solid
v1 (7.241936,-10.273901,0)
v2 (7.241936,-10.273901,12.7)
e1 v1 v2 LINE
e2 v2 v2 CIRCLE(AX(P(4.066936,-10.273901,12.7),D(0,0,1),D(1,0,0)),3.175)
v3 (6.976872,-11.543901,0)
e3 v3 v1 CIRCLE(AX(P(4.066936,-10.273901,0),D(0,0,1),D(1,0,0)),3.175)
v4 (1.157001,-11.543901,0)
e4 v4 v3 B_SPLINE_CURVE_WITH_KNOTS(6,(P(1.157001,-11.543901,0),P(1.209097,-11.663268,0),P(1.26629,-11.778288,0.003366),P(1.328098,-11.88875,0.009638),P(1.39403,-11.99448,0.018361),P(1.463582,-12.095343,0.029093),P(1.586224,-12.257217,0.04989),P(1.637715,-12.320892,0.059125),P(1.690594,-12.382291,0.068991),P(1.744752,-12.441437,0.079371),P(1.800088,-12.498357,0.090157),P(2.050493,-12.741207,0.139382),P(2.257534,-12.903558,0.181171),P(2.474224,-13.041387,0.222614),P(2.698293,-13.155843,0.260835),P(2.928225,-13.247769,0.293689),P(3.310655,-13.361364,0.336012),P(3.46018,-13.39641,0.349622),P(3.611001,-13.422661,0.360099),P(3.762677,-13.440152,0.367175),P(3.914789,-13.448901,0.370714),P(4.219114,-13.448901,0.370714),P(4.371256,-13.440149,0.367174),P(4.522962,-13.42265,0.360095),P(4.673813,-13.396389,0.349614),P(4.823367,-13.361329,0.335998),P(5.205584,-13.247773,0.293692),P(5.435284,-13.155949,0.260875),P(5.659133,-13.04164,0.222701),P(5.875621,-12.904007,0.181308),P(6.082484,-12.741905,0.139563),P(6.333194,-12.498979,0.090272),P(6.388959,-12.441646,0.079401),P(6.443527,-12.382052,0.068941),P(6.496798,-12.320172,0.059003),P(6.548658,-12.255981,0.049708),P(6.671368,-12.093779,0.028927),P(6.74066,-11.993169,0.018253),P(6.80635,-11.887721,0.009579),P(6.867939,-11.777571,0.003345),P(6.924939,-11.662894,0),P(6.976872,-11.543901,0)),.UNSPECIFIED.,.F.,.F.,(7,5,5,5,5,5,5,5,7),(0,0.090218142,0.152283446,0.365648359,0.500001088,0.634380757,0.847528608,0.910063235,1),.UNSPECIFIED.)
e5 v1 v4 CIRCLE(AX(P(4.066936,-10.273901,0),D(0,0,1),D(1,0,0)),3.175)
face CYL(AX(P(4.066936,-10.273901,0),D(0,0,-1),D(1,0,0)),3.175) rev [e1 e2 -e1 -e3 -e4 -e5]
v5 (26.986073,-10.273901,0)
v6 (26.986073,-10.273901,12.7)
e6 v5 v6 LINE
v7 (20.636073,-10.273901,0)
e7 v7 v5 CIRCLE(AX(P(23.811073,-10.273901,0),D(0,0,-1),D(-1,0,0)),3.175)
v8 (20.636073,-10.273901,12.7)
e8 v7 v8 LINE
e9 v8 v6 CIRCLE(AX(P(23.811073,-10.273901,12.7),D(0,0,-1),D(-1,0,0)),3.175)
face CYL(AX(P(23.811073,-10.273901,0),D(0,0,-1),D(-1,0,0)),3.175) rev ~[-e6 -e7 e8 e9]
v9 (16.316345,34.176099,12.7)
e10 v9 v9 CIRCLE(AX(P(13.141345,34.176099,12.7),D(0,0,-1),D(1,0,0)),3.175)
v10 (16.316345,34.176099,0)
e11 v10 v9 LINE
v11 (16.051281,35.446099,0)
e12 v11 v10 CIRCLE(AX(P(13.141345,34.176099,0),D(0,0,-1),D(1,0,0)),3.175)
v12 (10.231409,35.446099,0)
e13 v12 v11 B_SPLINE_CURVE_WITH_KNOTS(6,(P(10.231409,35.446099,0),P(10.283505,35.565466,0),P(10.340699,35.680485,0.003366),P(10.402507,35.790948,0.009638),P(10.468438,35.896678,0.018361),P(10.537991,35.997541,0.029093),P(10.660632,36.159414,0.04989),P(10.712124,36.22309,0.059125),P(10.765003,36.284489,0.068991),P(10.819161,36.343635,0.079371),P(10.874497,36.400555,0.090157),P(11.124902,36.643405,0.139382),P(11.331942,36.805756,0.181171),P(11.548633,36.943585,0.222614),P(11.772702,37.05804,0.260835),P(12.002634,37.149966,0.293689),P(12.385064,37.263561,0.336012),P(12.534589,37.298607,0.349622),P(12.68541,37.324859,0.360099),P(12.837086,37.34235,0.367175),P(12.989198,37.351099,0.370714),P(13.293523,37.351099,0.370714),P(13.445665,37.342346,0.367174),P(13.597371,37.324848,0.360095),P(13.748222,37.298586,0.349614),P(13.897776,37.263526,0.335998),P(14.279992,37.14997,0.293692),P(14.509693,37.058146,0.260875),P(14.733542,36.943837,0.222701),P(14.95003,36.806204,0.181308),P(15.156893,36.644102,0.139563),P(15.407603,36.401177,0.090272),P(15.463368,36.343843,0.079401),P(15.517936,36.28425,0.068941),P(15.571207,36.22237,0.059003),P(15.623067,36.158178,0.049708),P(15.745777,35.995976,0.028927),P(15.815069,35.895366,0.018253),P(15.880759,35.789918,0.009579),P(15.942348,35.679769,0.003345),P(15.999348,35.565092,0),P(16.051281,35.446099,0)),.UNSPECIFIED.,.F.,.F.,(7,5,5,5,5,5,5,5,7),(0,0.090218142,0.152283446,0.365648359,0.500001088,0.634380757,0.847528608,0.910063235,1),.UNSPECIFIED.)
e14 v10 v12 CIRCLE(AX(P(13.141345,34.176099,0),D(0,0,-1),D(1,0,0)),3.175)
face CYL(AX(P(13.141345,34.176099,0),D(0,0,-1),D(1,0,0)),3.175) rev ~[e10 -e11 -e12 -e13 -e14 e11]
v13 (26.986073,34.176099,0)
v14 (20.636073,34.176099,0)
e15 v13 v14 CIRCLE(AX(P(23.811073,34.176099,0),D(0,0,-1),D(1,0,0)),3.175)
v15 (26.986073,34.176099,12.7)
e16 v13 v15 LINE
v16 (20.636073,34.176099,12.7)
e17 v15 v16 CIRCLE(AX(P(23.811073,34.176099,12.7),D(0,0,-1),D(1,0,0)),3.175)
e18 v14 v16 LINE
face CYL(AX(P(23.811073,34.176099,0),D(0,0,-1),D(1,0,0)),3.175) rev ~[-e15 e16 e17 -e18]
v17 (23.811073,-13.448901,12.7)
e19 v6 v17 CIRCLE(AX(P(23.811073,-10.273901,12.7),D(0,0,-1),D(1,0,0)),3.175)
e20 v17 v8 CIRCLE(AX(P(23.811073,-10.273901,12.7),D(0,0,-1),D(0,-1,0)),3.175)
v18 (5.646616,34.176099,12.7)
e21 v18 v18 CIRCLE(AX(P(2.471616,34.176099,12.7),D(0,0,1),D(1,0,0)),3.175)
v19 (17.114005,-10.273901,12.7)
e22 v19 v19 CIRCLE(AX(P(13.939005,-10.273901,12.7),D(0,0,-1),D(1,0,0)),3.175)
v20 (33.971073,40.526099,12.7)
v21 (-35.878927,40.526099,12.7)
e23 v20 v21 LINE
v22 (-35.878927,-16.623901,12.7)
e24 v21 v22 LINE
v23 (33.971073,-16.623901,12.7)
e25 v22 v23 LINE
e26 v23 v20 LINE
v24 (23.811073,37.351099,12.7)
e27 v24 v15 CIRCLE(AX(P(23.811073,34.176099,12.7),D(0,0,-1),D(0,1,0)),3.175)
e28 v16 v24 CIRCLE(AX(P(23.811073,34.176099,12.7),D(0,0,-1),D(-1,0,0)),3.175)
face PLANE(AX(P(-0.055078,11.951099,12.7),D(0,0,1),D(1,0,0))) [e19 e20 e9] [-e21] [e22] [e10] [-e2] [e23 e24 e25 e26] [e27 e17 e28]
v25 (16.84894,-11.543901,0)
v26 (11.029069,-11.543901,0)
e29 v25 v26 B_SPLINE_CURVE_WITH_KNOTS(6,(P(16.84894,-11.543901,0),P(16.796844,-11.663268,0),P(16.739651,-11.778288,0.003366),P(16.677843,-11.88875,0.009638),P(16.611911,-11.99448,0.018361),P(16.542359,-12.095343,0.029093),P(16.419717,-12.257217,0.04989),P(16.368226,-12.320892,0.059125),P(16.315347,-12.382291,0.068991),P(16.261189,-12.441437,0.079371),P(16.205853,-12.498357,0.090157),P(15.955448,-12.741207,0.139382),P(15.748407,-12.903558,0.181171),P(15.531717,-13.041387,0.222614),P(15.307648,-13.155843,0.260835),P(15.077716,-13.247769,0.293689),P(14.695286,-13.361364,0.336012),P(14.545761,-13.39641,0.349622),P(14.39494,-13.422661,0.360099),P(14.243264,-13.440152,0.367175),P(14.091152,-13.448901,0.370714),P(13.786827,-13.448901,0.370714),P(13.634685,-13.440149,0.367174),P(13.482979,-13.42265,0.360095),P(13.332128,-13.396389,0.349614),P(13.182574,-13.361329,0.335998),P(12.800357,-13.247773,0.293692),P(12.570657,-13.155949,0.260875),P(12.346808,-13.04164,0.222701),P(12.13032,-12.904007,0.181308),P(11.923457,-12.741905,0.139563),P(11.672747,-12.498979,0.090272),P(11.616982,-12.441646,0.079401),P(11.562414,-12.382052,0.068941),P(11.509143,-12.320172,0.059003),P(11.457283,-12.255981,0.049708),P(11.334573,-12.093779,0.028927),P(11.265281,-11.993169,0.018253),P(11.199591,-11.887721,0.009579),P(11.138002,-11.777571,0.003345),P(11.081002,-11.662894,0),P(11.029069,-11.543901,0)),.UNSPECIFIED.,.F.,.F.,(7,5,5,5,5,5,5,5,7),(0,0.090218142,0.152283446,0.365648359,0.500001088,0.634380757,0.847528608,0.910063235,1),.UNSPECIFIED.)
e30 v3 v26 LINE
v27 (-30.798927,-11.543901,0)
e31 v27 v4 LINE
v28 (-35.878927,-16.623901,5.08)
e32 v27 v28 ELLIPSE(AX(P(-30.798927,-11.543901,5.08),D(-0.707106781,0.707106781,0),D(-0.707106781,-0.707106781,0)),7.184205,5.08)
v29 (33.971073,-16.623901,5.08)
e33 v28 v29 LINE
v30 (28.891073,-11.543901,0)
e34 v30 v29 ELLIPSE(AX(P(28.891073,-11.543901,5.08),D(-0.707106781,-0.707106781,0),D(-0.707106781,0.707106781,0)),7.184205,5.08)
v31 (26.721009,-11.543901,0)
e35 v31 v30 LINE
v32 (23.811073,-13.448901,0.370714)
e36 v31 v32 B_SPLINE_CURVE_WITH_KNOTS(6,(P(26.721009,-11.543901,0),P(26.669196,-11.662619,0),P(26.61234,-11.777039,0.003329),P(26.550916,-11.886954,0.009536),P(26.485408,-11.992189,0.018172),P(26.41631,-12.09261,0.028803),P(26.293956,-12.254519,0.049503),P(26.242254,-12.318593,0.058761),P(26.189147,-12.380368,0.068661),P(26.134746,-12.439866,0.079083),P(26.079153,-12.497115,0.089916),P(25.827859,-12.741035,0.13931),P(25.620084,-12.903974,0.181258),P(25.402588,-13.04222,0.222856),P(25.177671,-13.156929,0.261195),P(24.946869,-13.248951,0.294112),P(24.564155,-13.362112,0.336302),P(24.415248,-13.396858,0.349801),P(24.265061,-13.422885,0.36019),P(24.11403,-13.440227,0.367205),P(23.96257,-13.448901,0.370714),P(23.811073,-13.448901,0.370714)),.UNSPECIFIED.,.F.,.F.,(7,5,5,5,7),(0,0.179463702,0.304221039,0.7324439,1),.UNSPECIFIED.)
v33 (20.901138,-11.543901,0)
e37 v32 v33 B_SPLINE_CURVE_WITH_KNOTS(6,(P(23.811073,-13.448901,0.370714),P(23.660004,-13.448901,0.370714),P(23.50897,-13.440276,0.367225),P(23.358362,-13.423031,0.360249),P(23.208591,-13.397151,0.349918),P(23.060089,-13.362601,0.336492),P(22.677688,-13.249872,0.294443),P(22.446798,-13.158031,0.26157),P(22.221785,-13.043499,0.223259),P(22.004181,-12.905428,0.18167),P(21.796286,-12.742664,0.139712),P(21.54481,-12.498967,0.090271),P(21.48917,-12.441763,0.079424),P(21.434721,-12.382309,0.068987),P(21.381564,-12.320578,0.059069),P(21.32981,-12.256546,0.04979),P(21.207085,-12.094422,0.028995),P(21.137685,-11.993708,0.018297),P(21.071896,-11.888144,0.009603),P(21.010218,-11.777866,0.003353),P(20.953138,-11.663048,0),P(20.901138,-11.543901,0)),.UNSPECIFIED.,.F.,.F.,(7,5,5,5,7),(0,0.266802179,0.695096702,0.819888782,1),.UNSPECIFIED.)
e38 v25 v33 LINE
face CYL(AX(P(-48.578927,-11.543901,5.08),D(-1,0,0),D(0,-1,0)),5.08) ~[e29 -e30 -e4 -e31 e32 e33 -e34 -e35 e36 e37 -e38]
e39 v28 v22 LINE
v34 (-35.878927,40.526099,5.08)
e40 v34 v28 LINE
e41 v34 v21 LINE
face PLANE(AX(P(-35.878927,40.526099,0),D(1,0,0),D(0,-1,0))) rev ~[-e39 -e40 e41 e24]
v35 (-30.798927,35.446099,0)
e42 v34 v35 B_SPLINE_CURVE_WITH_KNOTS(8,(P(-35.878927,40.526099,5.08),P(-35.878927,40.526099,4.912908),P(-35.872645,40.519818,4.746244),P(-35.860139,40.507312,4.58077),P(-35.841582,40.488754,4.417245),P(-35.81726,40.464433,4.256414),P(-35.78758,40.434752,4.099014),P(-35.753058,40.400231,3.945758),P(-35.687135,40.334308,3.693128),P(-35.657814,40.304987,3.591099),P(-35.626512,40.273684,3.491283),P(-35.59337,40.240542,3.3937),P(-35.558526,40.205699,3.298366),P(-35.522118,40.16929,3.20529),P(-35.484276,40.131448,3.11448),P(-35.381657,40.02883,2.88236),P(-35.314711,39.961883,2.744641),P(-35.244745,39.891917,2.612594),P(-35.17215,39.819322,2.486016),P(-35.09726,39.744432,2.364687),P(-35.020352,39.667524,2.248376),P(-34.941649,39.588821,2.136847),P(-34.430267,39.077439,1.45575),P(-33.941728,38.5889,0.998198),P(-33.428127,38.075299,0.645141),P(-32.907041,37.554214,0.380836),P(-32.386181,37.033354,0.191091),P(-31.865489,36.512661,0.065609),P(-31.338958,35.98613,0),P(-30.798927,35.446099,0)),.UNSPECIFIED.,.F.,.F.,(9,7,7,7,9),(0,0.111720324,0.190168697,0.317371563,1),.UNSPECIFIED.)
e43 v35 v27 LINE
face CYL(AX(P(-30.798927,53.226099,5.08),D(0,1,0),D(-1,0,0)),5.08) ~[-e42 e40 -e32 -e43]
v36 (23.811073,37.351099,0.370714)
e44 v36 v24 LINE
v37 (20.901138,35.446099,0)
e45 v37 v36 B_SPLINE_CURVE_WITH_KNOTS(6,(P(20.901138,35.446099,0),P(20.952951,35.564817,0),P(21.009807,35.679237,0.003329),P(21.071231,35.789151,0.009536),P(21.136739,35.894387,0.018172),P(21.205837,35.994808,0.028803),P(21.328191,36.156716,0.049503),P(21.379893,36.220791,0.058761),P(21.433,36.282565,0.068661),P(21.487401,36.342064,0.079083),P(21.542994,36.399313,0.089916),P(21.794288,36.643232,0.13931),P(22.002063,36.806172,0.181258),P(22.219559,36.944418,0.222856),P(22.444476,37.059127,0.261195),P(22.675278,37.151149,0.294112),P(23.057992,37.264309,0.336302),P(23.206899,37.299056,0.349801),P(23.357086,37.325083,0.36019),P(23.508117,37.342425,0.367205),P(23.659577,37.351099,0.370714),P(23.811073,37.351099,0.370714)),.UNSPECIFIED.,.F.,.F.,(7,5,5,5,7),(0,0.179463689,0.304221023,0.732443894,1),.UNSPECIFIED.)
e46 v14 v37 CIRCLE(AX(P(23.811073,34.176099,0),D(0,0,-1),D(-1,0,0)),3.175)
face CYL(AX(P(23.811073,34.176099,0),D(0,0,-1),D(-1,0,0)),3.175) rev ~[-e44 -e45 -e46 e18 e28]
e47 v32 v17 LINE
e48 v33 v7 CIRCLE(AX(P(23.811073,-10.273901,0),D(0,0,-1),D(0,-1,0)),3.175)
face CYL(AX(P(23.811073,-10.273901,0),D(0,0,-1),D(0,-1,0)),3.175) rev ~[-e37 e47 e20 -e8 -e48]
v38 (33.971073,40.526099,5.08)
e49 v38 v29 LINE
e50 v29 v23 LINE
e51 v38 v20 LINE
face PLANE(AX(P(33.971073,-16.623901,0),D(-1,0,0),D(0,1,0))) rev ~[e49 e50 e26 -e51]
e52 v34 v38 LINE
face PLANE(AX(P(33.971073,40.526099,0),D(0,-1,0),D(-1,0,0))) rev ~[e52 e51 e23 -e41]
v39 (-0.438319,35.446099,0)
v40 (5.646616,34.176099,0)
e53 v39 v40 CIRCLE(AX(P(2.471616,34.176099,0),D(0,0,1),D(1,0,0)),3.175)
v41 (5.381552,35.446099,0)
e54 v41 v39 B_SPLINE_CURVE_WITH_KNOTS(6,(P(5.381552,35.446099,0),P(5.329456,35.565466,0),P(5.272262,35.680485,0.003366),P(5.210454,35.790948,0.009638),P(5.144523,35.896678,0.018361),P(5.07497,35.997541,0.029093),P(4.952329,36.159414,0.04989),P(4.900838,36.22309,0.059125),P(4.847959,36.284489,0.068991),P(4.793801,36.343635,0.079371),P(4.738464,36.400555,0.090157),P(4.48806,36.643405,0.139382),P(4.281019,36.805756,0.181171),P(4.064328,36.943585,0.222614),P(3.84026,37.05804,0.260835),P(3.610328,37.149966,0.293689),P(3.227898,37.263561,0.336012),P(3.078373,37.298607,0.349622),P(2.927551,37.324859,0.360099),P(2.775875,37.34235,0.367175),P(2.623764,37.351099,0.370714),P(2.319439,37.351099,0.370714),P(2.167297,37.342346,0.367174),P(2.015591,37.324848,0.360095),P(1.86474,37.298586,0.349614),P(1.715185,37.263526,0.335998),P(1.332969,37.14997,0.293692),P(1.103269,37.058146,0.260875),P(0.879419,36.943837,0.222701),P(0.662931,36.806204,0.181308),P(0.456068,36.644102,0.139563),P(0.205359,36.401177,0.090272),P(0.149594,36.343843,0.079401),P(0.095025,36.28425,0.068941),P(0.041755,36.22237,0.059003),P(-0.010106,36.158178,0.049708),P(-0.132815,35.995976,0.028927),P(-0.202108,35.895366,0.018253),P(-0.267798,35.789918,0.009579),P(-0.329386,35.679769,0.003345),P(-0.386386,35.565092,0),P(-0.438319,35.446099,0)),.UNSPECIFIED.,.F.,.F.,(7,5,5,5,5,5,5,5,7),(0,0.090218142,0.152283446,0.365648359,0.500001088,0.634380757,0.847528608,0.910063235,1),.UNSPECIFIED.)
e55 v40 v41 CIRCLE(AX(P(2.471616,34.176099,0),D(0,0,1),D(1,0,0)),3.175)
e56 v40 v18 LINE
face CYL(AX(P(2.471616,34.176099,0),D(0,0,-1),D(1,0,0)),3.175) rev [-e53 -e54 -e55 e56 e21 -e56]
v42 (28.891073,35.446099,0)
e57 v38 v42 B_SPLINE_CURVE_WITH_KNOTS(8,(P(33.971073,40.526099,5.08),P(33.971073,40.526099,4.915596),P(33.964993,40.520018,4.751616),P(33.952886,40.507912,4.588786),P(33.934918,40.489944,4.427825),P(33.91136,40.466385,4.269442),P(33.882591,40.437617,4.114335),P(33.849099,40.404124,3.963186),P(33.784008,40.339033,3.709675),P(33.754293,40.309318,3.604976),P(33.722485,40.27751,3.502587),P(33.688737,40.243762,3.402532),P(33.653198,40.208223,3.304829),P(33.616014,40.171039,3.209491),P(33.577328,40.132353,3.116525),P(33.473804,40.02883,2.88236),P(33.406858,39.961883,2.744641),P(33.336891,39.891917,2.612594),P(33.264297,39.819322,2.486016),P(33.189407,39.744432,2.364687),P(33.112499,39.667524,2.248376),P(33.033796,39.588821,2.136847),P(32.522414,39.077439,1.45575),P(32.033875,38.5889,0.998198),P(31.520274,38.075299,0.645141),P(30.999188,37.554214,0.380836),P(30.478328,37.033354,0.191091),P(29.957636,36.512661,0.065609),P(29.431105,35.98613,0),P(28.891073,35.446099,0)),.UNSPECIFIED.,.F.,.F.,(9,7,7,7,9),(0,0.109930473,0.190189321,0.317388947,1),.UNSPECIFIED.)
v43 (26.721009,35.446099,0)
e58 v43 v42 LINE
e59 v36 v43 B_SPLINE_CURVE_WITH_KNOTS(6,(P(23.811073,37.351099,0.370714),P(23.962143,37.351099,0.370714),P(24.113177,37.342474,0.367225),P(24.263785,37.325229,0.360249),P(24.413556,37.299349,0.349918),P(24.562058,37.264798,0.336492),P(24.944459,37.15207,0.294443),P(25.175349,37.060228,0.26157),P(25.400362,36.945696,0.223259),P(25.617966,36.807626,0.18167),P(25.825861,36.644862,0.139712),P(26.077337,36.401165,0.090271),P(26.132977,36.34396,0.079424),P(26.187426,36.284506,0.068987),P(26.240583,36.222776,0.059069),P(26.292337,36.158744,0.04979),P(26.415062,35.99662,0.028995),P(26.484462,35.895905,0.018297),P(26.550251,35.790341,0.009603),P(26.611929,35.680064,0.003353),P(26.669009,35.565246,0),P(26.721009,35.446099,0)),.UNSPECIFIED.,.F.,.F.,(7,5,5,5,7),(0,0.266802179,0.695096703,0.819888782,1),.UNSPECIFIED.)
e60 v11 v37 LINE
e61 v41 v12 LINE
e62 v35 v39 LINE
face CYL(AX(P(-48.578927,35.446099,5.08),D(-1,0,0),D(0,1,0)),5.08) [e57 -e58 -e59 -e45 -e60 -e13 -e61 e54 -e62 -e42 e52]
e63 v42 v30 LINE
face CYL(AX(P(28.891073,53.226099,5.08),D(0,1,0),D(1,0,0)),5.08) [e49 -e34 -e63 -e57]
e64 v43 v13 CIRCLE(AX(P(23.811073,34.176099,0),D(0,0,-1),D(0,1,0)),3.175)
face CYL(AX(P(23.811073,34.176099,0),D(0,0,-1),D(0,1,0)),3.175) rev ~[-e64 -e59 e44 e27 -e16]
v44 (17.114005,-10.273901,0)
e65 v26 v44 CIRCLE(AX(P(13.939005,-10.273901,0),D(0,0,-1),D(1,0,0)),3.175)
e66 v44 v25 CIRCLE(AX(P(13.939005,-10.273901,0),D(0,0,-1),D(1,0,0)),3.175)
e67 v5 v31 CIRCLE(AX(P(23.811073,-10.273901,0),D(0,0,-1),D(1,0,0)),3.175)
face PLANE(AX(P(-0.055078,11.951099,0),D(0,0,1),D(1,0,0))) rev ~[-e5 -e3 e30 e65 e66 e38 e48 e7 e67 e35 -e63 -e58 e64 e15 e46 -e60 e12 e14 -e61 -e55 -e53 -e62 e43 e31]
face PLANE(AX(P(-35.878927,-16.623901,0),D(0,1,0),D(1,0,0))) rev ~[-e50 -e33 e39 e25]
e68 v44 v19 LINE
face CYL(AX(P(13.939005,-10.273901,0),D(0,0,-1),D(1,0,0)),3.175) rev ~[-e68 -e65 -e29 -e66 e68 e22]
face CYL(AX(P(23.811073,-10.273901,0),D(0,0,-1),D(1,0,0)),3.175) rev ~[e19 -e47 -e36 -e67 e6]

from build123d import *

# Parameters (mm, degrees)
F0_R        = 3.175
F1_DEPTH    = 12.7
F2_T1_DEPTH = 95.25
F2_T3_DEPTH = 82.55


# Not quite as in the source:
# - a fillet or chamfer that OpenCascade refuses, or shapes differently, is made with other operations: its cross-section is extruded or revolved along the edge and cut away or added


with BuildPart() as f1:
    # F0 (on Top) → F1 (new body)
    with BuildSketch(Plane.XY):
        with BuildLine():
            Line((23.8110734844, 40.5260987967), (-35.8789265156, 40.5260987967))
            Line((-35.8789265156, 40.5260987967), (-35.8789265156, -16.6239012033))
            Line((-35.8789265156, -16.6239012033), (23.8110734844, -16.6239012033))
            Line((23.8110734844, -16.6239012033), (23.8110734844, -13.4489012033))
            ThreePointArc((23.8110734844, -13.4489012033), (21.5660094542, -12.5189652335), (20.6360734844, -10.2739012033))
            ThreePointArc((20.6360734844, -10.2739012033), (23.8110734844, -7.0989012033), (26.9860734844, -10.2739012033))
            Line((26.9860734844, -10.2739012033), (33.9710734844, -10.2739012033))
            Line((33.9710734844, -10.2739012033), (33.9710734844, 34.1760987967))
            Line((33.9710734844, 34.1760987967), (26.9860734844, 34.1760987967))
            ThreePointArc((26.9860734844, 34.1760987967), (23.8110734844, 31.0010987967), (20.6360734844, 34.1760987967))
            ThreePointArc((20.6360734844, 34.1760987967), (21.5660094542, 36.421162827), (23.8110734844, 37.3510987967))
            Line((23.8110734844, 37.3510987967), (23.8110734844, 40.5260987967))
        make_face()
        with Locations((4.0669361824, -10.2739012033)):
            Circle(F0_R, mode=Mode.SUBTRACT)
        with BuildLine():
            ThreePointArc((10.7640048334, -10.2739012033), (13.9390048334, -7.0989012033), (17.1140048334, -10.2739012033))
            ThreePointArc((17.1140048334, -10.2739012033), (13.9390048334, -13.4489012033), (10.7640048334, -10.2739012033))
        make_face(mode=Mode.SUBTRACT)
        with Locations((2.4716164917, 34.1760987967)):
            Circle(F0_R, mode=Mode.SUBTRACT)
        with BuildLine():
            ThreePointArc((9.966344988, 34.1760987967), (13.141344988, 37.3510987967), (16.316344988, 34.1760987967))
            ThreePointArc((16.316344988, 34.1760987967), (13.141344988, 31.0010987967), (9.966344988, 34.1760987967))
        make_face(mode=Mode.SUBTRACT)
        with BuildLine():
            Line((33.9710734844, 40.5260987967), (23.8110734844, 40.5260987967))
            Line((23.8110734844, 40.5260987967), (23.8110734844, 37.3510987967))
            ThreePointArc((23.8110734844, 37.3510987967), (26.0561375147, 36.421162827), (26.9860734844, 34.1760987967))
            Line((26.9860734844, 34.1760987967), (33.9710734844, 34.1760987967))
            Line((33.9710734844, 34.1760987967), (33.9710734844, 40.5260987967))
        make_face()
        with BuildLine():
            Line((23.8110734844, -13.4489012033), (23.8110734844, -16.6239012033))
            Line((23.8110734844, -16.6239012033), (33.9710734844, -16.6239012033))
            Line((33.9710734844, -16.6239012033), (33.9710734844, -10.2739012033))
            Line((33.9710734844, -10.2739012033), (26.9860734844, -10.2739012033))
            ThreePointArc((26.9860734844, -10.2739012033), (26.0561375147, -12.5189652335), (23.8110734844, -13.4489012033))
        make_face()
    extrude(amount=F1_DEPTH)

    # F2: fillet of radius 5.08 on 4 edges, made by hand

    # F2_s2 → F2_t1 (cut)
    with BuildSketch(Plane.YZ.offset(-48.5789265156)):
        with BuildLine():
            ThreePointArc((-16.6239012033, 5.08), (-15.1360036517, 1.4878975516), (-11.5439012033, 0))
            Line((-11.5439012033, 0), (-16.6239012033, 0))
            Line((-16.6239012033, 0), (-16.6239012033, 5.08))
        make_face()
        with BuildLine():
            ThreePointArc((40.5260987967, 5.08), (39.0382012452, 1.4878975516), (35.4460987967, 0))
            Line((35.4460987967, 0), (40.5260987967, 0))
            Line((40.5260987967, 0), (40.5260987967, 5.08))
        make_face()
    extrude(amount=F2_T1_DEPTH, mode=Mode.SUBTRACT)

    # F2_s4 → F2_t3 (cut)
    with BuildSketch(Plane.XZ.offset(-53.2260987967)):
        with BuildLine():
            ThreePointArc((33.9710734844, 5.08), (32.4831759328, 1.4878975516), (28.8910734844, 0))
            Line((28.8910734844, 0), (33.9710734844, 0))
            Line((33.9710734844, 0), (33.9710734844, 5.08))
        make_face()
        with BuildLine():
            ThreePointArc((-35.8789265156, 5.08), (-34.391028964, 1.4878975516), (-30.7989265156, 0))
            Line((-30.7989265156, 0), (-35.8789265156, 0))
            Line((-35.8789265156, 0), (-35.8789265156, 5.08))
        make_face()
    extrude(amount=F2_T3_DEPTH, mode=Mode.SUBTRACT)


solid = f1.part
